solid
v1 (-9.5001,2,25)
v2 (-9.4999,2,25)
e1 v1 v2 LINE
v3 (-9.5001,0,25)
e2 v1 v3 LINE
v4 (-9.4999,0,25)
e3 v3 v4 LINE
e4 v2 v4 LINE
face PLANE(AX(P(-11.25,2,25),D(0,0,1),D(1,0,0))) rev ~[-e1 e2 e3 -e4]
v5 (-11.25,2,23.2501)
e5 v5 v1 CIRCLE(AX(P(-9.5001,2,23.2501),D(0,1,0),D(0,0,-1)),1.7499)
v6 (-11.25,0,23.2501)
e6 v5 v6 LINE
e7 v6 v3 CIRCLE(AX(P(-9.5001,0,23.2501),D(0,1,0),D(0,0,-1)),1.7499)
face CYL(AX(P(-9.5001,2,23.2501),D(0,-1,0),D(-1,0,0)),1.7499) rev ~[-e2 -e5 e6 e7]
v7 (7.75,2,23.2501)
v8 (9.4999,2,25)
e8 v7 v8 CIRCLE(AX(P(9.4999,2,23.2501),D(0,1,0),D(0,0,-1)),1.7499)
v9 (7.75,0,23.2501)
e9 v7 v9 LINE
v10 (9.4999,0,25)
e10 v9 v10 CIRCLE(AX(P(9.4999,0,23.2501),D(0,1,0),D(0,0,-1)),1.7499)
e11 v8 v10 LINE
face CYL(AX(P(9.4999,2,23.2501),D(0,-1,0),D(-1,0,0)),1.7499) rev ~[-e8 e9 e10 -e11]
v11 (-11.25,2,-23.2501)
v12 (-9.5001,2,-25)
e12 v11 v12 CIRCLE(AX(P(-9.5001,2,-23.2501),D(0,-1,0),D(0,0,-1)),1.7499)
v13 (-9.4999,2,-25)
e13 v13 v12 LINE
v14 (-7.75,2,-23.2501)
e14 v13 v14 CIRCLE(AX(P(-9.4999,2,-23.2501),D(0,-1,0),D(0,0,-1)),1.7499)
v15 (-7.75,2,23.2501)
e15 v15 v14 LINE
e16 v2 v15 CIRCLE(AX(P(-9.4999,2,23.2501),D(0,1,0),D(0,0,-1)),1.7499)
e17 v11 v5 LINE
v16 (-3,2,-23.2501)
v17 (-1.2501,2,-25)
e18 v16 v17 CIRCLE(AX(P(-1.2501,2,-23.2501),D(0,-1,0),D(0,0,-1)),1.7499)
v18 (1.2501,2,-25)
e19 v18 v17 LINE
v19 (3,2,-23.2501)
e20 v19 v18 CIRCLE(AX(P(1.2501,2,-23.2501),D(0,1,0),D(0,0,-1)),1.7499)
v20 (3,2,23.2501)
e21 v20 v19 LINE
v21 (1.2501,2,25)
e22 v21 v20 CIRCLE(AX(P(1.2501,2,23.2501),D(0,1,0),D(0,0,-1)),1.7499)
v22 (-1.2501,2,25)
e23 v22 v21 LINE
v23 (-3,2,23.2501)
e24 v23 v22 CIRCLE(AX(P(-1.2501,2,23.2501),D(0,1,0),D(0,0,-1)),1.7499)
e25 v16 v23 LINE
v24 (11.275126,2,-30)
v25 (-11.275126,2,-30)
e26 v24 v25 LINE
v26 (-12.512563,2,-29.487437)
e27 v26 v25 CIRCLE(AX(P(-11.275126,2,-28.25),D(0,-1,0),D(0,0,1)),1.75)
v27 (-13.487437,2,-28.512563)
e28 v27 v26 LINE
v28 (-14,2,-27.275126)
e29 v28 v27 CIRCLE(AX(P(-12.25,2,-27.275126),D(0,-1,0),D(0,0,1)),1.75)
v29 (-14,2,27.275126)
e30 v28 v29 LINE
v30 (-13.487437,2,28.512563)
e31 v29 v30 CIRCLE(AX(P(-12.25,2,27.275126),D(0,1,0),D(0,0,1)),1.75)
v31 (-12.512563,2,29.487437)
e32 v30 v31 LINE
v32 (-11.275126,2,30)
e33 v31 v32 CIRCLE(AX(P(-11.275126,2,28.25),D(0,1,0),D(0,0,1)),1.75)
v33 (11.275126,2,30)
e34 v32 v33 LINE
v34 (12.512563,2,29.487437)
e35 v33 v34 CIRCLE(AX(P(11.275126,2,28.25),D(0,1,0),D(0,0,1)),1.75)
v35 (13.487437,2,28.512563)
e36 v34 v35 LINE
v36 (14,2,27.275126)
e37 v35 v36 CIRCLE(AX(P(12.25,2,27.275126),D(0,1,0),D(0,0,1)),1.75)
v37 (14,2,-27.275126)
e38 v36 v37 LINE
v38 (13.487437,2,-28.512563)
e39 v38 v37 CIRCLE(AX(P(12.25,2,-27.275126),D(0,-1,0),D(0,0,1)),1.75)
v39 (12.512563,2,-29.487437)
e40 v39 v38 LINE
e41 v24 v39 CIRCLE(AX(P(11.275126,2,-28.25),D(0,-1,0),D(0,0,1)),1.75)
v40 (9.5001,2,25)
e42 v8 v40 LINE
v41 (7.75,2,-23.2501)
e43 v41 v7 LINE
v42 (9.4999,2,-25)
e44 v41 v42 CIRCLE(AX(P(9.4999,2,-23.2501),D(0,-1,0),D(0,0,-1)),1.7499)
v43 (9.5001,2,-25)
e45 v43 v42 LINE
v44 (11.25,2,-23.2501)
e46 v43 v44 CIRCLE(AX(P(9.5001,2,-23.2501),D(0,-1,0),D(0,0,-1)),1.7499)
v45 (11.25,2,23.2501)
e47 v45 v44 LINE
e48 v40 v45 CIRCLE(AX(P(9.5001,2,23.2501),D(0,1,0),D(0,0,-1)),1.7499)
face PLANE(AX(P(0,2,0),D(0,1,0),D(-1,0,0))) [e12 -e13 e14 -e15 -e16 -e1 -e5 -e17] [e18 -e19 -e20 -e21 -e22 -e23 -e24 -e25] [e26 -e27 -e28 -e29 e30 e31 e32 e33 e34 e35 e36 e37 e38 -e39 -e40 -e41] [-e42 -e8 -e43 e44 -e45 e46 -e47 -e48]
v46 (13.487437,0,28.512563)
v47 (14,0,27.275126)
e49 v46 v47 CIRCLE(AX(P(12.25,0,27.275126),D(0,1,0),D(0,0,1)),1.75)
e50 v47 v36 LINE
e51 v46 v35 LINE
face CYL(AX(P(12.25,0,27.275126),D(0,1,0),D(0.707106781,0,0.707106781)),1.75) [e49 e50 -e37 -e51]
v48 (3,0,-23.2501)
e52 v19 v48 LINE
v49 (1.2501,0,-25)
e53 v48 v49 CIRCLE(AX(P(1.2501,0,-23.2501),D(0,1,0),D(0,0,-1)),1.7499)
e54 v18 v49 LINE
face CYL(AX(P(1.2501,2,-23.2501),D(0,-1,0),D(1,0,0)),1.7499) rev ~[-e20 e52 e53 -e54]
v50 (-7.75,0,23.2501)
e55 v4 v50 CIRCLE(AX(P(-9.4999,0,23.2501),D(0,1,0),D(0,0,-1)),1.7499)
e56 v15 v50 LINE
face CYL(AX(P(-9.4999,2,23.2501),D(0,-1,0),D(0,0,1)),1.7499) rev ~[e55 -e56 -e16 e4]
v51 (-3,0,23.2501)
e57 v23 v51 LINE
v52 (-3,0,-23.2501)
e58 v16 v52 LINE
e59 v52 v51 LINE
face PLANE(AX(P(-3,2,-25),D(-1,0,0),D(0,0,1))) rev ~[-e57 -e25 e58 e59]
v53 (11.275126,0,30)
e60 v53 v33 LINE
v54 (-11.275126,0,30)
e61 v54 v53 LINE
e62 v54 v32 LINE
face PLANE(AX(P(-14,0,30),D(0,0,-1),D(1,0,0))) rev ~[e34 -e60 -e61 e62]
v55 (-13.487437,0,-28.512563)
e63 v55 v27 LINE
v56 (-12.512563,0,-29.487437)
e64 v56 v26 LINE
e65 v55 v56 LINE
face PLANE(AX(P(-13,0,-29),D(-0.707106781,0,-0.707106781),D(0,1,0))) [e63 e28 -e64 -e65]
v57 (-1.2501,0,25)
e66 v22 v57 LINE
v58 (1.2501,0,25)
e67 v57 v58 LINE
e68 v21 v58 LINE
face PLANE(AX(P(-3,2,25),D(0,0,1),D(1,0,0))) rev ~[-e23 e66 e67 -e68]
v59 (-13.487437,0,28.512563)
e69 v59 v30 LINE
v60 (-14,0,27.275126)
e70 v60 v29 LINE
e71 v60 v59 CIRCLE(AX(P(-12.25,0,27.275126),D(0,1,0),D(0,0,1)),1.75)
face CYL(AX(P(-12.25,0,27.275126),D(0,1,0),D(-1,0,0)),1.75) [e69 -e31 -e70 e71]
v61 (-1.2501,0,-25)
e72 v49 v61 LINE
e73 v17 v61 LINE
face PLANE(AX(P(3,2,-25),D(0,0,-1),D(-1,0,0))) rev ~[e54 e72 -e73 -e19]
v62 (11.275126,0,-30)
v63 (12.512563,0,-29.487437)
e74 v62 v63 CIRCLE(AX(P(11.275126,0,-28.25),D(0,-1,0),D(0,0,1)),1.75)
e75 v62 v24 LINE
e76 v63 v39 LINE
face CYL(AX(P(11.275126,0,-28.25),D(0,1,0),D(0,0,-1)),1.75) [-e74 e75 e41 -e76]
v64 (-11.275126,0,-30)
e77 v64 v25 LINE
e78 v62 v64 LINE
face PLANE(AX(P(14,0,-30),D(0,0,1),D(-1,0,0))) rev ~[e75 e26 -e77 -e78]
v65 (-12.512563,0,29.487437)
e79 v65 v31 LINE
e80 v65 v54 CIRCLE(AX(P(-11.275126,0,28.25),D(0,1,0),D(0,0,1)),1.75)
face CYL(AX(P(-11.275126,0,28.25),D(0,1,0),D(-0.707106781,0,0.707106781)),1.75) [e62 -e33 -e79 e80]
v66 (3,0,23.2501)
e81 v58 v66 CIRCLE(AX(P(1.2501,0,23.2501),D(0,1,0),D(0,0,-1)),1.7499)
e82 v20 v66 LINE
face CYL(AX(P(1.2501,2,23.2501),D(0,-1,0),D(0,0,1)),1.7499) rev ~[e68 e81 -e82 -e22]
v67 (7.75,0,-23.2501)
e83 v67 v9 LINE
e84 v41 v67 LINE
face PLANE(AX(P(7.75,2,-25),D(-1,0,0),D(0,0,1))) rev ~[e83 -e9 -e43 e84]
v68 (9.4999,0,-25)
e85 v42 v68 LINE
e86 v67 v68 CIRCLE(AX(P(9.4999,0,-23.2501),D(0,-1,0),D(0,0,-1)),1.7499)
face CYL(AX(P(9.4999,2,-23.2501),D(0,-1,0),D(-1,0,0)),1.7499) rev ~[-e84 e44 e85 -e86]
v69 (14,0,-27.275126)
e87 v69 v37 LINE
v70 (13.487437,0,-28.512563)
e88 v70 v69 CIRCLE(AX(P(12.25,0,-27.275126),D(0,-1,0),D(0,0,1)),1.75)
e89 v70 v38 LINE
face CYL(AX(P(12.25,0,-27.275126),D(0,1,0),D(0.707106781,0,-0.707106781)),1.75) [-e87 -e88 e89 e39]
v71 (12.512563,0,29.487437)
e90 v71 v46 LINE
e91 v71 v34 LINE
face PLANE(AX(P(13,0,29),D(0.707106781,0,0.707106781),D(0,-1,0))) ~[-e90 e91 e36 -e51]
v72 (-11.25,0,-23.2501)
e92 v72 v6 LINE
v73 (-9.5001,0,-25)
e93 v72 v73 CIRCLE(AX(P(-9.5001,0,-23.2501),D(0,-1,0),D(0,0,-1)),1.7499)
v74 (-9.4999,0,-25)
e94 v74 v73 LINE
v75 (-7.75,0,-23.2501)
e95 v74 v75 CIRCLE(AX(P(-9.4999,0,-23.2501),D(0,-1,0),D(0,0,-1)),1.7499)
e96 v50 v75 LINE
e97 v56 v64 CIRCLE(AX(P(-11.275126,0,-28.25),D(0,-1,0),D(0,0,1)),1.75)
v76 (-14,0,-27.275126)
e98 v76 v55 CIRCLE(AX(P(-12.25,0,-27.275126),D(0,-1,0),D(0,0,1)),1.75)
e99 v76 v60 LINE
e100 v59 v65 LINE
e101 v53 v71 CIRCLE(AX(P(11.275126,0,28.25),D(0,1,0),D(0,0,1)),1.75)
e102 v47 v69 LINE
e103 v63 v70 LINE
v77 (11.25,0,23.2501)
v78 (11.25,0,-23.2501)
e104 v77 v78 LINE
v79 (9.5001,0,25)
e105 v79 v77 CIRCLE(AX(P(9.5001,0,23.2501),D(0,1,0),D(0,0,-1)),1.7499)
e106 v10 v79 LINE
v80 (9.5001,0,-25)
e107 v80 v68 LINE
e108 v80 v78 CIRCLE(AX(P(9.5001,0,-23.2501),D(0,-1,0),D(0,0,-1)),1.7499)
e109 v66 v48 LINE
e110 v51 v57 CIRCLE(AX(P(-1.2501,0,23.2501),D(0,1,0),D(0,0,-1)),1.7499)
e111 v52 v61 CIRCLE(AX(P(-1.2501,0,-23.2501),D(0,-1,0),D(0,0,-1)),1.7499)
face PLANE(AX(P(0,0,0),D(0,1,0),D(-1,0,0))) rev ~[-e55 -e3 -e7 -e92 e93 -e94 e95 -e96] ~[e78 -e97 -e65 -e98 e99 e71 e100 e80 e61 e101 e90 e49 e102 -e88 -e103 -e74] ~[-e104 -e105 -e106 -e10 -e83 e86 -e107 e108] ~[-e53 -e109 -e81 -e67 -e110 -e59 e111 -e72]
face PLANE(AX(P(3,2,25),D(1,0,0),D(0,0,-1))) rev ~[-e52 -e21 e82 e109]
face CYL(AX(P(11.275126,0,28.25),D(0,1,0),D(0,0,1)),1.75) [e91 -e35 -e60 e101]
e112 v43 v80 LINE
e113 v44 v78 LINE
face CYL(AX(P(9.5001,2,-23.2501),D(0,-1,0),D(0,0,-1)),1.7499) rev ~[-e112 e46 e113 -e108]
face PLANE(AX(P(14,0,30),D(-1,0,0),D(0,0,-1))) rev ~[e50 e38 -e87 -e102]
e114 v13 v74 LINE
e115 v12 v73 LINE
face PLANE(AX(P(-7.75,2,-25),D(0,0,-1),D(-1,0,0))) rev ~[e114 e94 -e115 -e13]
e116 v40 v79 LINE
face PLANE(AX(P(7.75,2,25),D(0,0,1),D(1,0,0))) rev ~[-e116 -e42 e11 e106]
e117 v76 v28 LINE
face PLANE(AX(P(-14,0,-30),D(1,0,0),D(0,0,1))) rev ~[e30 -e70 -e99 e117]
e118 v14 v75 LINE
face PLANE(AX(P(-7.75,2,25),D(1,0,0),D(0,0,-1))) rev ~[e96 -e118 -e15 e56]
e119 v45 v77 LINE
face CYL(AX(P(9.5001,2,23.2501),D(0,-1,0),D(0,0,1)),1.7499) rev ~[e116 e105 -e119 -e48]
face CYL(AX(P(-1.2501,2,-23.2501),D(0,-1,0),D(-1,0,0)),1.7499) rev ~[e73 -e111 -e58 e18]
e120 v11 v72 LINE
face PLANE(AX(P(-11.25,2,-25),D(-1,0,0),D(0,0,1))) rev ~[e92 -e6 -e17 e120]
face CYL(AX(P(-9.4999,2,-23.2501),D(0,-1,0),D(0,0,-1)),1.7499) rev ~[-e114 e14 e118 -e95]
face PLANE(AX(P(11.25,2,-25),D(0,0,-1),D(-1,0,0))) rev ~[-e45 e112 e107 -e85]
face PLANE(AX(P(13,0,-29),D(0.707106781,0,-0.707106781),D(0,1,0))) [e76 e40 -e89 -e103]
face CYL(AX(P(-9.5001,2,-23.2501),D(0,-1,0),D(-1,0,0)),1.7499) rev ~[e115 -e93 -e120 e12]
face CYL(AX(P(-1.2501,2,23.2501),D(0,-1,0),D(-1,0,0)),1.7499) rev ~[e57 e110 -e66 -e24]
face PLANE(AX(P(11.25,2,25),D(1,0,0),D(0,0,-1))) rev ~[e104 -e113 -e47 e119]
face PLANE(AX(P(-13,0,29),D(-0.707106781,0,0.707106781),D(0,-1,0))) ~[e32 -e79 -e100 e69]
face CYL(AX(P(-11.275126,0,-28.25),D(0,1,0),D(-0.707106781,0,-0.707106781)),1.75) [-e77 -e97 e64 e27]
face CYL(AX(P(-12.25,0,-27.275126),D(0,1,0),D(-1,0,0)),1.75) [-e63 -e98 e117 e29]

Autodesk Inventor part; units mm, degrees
ref_plane "YZ Plane" through (0, 0, 0) normal (1, 0, 0) x (0, 1, 0)
ref_plane "XZ Plane" through (0, 0, 0) normal (0, 1, 0) x (-1, 0, 0)
ref_plane "XY Plane" through (0, 0, 0) normal (0, 0, 1) x (1, 0, 0)
sketch "Szkic1" plane through (0, 0, 0) normal (0, 1, 0) x (-1, 0, 0)
  line L0 (14, 30) -> (-14, 30)
  line L1 (-14, 30) -> (-14, -30)
  line L2 (-14, -30) -> (14, -30)
  line L3 (14, -30) -> (14, 30)
  point P0 (0, 0)
  dimension "d0" = 28
  dimension "d1" = 14
  dimension "d2" = 60
  dimension "d3" = 30
extrude "Wyciągnięcie proste1" add sketch "Szkic1" along normal blind 2
sketch "Szkic2" plane through (0, 2, 0) normal (0, 1, 0) x (1, 0, 0)
  line L0 (-11.25, -25) -> (-7.75, -25)
  line L1 (-7.75, -25) -> (-7.75, 25)
  line L2 (-7.75, 25) -> (-11.25, 25)
  line L3 (-11.25, 25) -> (-11.25, -25)
  line L4 (7.75, -25) -> (11.25, -25)
  line L5 (11.25, -25) -> (11.25, 25)
  line L6 (11.25, 25) -> (7.75, 25)
  line L7 (7.75, 25) -> (7.75, -25)
  line L8 (-14, -30) -> (14, -30) projected
  line L9 (14, 30) -> (-14, 30) projected
  point P0 (0, 0)
  dimension "d6" = 3.5
  dimension "d7" = 3.5
  dimension "d8" = 5
  dimension "d9" = 0
  dimension "d10" = 5
  dimension "d11" = 0
  dimension "d12" = 15.5
  dimension "d13" = 7.75
extrude "Wyciągnięcie proste2" cut sketch "Szkic2" against normal blind 2
chamfer "Faza1" distance 2 angle 45 4 edges at (-14, 1, 30) (-14, 1, -30) (14, 1, -30) (14, 1, 30)
sketch "Szkic3" plane through (0, 2, 0) normal (0, 1, 0) x (1, 0, 0)
  line L0 (-3, -25) -> (3, -25)
  line L1 (3, -25) -> (3, 25)
  line L2 (3, 25) -> (-3, 25)
  line L3 (-3, 25) -> (-3, -25)
  point P0 (0, 0)
  dimension "d19" = 50
  dimension "d20" = 25
  dimension "d21" = 6
  dimension "d22" = 3
extrude "Wyciągnięcie proste3" cut sketch "Szkic3" against normal blind 2
fillet "Zaokrąglenie1" radius 1.75 12 edges at (3, 1, 25) (-7.75, 1, 25) (-11.25, 1, 25) (-3, 1, 25) (7.75, 1, 25) (-11.25, 1, -25) (-7.75, 1, -25) (-3, 1, -25) (3, 1, -25) (7.75, 1, -25) (11.25, 1, -25) (11.25, 1, 25)
fillet "Zaokrąglenie2" radius 1.75 8 edges at (-12, 1, -30) (-14, 1, -28) (12, 1, -30) (14, 1, -28) (12, 1, 30) (14, 1, 28) (-12, 1, 30) (-14, 1, 28)
properties part number "Holder"
